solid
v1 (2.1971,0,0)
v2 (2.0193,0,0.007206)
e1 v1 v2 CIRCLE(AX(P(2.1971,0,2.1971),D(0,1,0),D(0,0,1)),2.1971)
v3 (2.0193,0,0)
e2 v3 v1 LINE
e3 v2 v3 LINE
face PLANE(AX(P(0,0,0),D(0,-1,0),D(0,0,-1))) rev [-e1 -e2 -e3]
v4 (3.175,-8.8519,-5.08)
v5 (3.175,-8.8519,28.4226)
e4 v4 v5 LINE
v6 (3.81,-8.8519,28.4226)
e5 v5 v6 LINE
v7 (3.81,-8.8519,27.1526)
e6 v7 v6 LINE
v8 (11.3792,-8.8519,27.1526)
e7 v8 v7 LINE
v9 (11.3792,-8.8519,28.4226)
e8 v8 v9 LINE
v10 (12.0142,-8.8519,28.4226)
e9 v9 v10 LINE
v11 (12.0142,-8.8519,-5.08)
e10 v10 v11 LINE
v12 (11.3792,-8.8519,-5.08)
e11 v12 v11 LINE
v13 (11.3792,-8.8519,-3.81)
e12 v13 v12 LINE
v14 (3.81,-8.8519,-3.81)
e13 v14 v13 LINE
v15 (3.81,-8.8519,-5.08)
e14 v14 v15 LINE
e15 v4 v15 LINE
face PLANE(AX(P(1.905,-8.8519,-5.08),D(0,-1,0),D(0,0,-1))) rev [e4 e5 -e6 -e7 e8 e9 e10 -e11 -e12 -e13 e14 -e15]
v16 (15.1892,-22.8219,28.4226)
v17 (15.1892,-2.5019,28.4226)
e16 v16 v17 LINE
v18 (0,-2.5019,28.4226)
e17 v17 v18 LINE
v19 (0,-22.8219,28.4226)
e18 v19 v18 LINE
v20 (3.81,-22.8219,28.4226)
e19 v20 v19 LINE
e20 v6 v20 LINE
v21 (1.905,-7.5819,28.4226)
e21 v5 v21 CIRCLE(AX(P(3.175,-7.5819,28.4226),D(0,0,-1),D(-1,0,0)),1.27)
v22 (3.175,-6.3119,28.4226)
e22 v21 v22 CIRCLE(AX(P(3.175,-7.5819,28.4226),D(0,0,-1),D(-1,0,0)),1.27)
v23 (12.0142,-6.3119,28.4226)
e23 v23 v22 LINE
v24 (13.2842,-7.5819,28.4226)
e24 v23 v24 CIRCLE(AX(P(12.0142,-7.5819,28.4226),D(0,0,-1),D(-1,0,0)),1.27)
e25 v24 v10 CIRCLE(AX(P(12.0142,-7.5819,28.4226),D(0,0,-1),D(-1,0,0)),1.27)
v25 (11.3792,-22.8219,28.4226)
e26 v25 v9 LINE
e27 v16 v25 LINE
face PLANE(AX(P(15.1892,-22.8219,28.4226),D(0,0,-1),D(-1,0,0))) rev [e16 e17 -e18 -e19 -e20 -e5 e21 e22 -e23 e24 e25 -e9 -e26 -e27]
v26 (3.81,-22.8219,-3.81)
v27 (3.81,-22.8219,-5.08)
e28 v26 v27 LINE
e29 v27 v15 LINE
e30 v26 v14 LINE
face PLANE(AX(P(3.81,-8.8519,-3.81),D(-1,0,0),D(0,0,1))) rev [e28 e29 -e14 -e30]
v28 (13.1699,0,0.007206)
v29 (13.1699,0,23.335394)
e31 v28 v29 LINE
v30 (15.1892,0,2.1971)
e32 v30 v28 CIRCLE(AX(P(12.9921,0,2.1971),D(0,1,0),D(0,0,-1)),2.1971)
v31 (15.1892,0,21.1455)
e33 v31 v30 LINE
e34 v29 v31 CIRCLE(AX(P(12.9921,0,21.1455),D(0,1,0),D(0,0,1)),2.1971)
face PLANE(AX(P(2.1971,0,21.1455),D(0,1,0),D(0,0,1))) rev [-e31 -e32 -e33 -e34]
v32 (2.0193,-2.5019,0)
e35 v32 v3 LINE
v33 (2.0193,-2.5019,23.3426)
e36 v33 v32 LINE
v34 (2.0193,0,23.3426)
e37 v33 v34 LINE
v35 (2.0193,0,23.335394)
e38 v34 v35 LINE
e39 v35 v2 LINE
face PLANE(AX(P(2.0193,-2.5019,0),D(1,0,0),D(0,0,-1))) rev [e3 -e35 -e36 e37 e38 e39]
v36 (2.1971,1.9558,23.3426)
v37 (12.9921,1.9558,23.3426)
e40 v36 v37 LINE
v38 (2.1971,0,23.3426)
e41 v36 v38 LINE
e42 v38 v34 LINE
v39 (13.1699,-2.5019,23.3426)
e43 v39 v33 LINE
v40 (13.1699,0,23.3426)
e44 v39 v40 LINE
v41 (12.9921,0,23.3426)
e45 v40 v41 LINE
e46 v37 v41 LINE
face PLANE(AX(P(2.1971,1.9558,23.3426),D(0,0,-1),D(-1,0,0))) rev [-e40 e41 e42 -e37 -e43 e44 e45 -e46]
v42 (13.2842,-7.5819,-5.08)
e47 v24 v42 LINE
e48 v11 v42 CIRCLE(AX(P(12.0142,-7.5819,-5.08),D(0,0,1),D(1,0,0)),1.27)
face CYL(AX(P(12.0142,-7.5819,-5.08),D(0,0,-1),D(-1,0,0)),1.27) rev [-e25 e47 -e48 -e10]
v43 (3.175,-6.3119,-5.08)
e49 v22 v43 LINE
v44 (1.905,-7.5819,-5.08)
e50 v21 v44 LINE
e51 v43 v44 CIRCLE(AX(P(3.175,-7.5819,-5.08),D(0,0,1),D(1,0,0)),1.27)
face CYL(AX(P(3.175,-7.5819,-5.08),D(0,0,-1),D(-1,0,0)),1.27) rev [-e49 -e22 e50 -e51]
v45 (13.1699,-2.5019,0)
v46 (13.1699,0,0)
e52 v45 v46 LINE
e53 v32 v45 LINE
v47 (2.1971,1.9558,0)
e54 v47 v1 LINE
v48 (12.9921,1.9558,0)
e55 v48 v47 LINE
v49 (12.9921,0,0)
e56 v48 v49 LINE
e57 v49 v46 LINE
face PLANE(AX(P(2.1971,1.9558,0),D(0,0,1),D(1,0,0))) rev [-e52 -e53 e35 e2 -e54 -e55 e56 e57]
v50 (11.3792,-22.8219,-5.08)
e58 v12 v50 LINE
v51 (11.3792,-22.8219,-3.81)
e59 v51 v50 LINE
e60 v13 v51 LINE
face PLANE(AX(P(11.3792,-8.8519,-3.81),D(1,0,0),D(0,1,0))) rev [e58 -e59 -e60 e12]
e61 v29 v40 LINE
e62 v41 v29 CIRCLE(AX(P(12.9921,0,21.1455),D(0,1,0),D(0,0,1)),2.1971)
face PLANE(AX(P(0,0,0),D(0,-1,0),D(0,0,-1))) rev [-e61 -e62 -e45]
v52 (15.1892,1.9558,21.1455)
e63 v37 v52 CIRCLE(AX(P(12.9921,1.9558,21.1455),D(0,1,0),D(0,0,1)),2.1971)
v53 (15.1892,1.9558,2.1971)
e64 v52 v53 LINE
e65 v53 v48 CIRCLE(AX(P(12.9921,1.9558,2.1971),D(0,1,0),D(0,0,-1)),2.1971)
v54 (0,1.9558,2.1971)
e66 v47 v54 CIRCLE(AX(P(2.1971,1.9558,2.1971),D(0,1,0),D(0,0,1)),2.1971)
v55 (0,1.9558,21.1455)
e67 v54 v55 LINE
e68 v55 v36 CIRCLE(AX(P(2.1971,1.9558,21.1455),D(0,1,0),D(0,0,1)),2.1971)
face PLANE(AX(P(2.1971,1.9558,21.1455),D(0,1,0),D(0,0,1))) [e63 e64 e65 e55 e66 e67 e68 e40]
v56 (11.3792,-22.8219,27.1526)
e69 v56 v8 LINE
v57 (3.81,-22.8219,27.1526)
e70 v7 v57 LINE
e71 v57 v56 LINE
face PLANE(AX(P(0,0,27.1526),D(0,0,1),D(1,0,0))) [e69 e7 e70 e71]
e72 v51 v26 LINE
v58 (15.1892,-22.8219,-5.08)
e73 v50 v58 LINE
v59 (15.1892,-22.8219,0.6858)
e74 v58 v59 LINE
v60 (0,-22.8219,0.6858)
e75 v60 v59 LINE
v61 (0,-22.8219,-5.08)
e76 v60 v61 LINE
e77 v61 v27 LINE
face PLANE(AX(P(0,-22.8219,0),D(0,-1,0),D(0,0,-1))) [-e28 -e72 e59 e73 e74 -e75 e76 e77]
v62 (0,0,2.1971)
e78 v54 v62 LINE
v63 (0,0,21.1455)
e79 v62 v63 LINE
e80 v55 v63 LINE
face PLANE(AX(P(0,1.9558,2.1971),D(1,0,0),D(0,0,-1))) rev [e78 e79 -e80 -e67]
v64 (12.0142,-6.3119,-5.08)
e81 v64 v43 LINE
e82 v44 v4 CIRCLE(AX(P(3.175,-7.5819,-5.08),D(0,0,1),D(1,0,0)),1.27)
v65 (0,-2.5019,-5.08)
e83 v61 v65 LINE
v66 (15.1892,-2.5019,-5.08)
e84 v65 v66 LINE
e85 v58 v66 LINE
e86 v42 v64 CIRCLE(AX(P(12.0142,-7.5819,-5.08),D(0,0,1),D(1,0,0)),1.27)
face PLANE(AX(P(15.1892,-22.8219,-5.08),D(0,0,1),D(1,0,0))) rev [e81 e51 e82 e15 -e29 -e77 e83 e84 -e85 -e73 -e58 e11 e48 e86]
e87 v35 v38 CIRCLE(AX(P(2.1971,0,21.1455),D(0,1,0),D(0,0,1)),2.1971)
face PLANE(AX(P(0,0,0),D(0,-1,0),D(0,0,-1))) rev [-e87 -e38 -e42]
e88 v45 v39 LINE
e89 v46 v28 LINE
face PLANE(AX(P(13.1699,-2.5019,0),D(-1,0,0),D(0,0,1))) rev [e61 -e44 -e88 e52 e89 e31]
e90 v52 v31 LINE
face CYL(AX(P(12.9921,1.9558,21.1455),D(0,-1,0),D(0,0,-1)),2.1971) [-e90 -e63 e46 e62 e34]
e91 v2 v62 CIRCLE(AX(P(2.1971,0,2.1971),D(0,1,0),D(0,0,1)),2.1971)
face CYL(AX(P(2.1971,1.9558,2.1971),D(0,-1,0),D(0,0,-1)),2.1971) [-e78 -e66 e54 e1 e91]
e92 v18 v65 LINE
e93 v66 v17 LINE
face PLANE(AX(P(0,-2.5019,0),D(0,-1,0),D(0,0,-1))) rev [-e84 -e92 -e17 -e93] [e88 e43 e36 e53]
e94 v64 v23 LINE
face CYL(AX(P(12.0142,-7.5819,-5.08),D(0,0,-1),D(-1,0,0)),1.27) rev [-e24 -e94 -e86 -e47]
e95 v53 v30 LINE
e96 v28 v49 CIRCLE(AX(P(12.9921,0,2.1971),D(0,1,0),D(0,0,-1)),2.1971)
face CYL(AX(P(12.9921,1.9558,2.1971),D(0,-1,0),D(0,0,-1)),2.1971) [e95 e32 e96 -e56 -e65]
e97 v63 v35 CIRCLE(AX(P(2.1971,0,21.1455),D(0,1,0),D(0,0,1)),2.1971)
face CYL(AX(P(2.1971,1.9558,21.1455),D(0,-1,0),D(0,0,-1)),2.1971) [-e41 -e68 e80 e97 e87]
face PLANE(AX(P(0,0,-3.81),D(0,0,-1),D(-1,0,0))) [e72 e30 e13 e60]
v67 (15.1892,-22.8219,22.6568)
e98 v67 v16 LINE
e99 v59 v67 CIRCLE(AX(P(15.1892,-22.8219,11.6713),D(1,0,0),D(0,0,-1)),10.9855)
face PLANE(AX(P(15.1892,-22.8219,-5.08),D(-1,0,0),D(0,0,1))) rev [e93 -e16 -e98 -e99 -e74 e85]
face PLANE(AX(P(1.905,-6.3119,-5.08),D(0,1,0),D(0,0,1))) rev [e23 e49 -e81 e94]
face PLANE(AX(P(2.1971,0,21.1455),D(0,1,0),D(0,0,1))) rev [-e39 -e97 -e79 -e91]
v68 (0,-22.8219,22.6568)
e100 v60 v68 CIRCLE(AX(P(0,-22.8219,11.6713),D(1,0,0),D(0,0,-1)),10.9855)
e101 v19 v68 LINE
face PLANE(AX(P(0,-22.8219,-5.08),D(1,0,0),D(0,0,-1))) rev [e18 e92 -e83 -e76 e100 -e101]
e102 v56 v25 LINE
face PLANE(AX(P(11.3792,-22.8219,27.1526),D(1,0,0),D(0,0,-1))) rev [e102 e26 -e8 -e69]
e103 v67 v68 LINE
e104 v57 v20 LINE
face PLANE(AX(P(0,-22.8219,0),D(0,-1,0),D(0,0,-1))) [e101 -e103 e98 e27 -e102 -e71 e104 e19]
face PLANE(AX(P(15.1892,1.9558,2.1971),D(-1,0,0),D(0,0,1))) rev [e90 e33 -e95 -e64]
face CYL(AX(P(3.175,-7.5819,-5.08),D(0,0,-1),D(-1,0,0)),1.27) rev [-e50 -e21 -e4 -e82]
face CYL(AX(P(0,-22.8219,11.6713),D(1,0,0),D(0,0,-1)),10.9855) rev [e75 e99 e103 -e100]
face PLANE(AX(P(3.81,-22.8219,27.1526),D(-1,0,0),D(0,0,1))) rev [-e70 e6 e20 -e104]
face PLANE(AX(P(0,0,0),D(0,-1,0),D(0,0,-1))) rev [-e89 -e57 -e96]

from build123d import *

# Parameters (mm, degrees)
BOSS_EXTRUDE1_DEPTH = 1.9558
SKETCH2_W           = 11.1506
SKETCH2_H           = 23.3426
BOSS_EXTRUDE2_DEPTH = 2.5019
SKETCH3_W           = 15.1892
SKETCH3_H           = 33.5026
BOSS_EXTRUDE3_DEPTH = 20.32
SKETCH4_R           = 10.9855
CUT_EXTRUDE1_DEPTH  = 40.489177087
SKETCH5_W           = 11.3792
SKETCH5_H           = 2.54
CUT_EXTRUDE2_DEPTH  = 44.289434312
FILLET1_R           = 1.27
SKETCH6_W           = 7.5692
SKETCH6_H           = 13.97
CUT_EXTRUDE3_DEPTH  = 1.27
SKETCH7_W           = 7.5692
SKETCH7_H           = 13.97
CUT_EXTRUDE4_DEPTH  = 1.27


with BuildPart() as part:
    # Sketch1 → Boss-Extrude1 (new body)
    with BuildSketch(Plane(origin=(0, 0, 0), x_dir=(1, 0, 0), z_dir=(0, 1, 0))):
        with BuildLine():
            Line((2.1971, 0), (12.9921, 0))
            ThreePointArc((12.9921, 0), (14.545684309, -0.643515691), (15.1892, -2.1971))
            Line((15.1892, -2.1971), (15.1892, -21.1455))
            ThreePointArc((15.1892, -21.1455), (14.545684309, -22.699084309), (12.9921, -23.3426))
            Line((12.9921, -23.3426), (2.1971, -23.3426))
            ThreePointArc((2.1971, -23.3426), (0.643515691, -22.699084309), (0, -21.1455))
            Line((0, -21.1455), (0, -2.1971))
            ThreePointArc((0, -2.1971), (0.643515691, -0.643515691), (2.1971, 0))
        make_face()
    extrude(amount=BOSS_EXTRUDE1_DEPTH)

    # Sketch2 → Boss-Extrude2 (add)
    with BuildSketch(Plane.XZ):
        with Locations((7.5946, 11.6713)):
            Rectangle(SKETCH2_W, SKETCH2_H)
    extrude(amount=BOSS_EXTRUDE2_DEPTH)

    # Sketch3 → Boss-Extrude3 (add)
    with BuildSketch(Plane.XZ.offset(2.5019)):
        with Locations((7.5946, 11.6713)):
            Rectangle(SKETCH3_W, SKETCH3_H)
    extrude(amount=BOSS_EXTRUDE3_DEPTH)

    # Sketch4 → Cut-Extrude1 (cut, through all)
    with BuildSketch(Plane(origin=(15.1892, 0, 0), x_dir=(0, 0, -1), z_dir=(1, 0, 0))):
        with Locations((-11.6713, -22.8219)):
            Circle(SKETCH4_R)
    extrude(amount=-CUT_EXTRUDE1_DEPTH, mode=Mode.SUBTRACT)

    # Sketch5 → Cut-Extrude2 (cut, through all)
    with BuildSketch(Plane.XY.offset(28.4226)):
        with Locations((7.5946, -7.5819)):
            Rectangle(SKETCH5_W, SKETCH5_H)
    extrude(amount=-CUT_EXTRUDE2_DEPTH, mode=Mode.SUBTRACT)

    # Fillet1
    fillet1_edges = [part.edges().sort_by_distance(p)[0] for p in [
        (13.2842, -8.8519, 11.6713),
        (13.2842, -6.3119, 11.6713),
        (1.905, -6.3119, 11.6713),
        (1.905, -8.8519, 11.6713),
    ]]
    fillet(fillet1_edges, radius=FILLET1_R - 0.0001)  # a hair under: the kernel refuses the full size

    # Sketch6 → Cut-Extrude3 (cut)
    with BuildSketch(Plane(origin=(0, 0, -5.08), x_dir=(-1, 0, 0), z_dir=(0, 0, -1))):
        with Locations((-7.5946, -15.8369)):
            Rectangle(SKETCH6_W, SKETCH6_H)
    extrude(amount=-CUT_EXTRUDE3_DEPTH, mode=Mode.SUBTRACT)

    # Sketch7 → Cut-Extrude4 (cut)
    with BuildSketch(Plane.XY.offset(28.4226)):
        with Locations((7.5946, -15.8369)):
            Rectangle(SKETCH7_W, SKETCH7_H)
    extrude(amount=-CUT_EXTRUDE4_DEPTH, mode=Mode.SUBTRACT)


solid = part.part
